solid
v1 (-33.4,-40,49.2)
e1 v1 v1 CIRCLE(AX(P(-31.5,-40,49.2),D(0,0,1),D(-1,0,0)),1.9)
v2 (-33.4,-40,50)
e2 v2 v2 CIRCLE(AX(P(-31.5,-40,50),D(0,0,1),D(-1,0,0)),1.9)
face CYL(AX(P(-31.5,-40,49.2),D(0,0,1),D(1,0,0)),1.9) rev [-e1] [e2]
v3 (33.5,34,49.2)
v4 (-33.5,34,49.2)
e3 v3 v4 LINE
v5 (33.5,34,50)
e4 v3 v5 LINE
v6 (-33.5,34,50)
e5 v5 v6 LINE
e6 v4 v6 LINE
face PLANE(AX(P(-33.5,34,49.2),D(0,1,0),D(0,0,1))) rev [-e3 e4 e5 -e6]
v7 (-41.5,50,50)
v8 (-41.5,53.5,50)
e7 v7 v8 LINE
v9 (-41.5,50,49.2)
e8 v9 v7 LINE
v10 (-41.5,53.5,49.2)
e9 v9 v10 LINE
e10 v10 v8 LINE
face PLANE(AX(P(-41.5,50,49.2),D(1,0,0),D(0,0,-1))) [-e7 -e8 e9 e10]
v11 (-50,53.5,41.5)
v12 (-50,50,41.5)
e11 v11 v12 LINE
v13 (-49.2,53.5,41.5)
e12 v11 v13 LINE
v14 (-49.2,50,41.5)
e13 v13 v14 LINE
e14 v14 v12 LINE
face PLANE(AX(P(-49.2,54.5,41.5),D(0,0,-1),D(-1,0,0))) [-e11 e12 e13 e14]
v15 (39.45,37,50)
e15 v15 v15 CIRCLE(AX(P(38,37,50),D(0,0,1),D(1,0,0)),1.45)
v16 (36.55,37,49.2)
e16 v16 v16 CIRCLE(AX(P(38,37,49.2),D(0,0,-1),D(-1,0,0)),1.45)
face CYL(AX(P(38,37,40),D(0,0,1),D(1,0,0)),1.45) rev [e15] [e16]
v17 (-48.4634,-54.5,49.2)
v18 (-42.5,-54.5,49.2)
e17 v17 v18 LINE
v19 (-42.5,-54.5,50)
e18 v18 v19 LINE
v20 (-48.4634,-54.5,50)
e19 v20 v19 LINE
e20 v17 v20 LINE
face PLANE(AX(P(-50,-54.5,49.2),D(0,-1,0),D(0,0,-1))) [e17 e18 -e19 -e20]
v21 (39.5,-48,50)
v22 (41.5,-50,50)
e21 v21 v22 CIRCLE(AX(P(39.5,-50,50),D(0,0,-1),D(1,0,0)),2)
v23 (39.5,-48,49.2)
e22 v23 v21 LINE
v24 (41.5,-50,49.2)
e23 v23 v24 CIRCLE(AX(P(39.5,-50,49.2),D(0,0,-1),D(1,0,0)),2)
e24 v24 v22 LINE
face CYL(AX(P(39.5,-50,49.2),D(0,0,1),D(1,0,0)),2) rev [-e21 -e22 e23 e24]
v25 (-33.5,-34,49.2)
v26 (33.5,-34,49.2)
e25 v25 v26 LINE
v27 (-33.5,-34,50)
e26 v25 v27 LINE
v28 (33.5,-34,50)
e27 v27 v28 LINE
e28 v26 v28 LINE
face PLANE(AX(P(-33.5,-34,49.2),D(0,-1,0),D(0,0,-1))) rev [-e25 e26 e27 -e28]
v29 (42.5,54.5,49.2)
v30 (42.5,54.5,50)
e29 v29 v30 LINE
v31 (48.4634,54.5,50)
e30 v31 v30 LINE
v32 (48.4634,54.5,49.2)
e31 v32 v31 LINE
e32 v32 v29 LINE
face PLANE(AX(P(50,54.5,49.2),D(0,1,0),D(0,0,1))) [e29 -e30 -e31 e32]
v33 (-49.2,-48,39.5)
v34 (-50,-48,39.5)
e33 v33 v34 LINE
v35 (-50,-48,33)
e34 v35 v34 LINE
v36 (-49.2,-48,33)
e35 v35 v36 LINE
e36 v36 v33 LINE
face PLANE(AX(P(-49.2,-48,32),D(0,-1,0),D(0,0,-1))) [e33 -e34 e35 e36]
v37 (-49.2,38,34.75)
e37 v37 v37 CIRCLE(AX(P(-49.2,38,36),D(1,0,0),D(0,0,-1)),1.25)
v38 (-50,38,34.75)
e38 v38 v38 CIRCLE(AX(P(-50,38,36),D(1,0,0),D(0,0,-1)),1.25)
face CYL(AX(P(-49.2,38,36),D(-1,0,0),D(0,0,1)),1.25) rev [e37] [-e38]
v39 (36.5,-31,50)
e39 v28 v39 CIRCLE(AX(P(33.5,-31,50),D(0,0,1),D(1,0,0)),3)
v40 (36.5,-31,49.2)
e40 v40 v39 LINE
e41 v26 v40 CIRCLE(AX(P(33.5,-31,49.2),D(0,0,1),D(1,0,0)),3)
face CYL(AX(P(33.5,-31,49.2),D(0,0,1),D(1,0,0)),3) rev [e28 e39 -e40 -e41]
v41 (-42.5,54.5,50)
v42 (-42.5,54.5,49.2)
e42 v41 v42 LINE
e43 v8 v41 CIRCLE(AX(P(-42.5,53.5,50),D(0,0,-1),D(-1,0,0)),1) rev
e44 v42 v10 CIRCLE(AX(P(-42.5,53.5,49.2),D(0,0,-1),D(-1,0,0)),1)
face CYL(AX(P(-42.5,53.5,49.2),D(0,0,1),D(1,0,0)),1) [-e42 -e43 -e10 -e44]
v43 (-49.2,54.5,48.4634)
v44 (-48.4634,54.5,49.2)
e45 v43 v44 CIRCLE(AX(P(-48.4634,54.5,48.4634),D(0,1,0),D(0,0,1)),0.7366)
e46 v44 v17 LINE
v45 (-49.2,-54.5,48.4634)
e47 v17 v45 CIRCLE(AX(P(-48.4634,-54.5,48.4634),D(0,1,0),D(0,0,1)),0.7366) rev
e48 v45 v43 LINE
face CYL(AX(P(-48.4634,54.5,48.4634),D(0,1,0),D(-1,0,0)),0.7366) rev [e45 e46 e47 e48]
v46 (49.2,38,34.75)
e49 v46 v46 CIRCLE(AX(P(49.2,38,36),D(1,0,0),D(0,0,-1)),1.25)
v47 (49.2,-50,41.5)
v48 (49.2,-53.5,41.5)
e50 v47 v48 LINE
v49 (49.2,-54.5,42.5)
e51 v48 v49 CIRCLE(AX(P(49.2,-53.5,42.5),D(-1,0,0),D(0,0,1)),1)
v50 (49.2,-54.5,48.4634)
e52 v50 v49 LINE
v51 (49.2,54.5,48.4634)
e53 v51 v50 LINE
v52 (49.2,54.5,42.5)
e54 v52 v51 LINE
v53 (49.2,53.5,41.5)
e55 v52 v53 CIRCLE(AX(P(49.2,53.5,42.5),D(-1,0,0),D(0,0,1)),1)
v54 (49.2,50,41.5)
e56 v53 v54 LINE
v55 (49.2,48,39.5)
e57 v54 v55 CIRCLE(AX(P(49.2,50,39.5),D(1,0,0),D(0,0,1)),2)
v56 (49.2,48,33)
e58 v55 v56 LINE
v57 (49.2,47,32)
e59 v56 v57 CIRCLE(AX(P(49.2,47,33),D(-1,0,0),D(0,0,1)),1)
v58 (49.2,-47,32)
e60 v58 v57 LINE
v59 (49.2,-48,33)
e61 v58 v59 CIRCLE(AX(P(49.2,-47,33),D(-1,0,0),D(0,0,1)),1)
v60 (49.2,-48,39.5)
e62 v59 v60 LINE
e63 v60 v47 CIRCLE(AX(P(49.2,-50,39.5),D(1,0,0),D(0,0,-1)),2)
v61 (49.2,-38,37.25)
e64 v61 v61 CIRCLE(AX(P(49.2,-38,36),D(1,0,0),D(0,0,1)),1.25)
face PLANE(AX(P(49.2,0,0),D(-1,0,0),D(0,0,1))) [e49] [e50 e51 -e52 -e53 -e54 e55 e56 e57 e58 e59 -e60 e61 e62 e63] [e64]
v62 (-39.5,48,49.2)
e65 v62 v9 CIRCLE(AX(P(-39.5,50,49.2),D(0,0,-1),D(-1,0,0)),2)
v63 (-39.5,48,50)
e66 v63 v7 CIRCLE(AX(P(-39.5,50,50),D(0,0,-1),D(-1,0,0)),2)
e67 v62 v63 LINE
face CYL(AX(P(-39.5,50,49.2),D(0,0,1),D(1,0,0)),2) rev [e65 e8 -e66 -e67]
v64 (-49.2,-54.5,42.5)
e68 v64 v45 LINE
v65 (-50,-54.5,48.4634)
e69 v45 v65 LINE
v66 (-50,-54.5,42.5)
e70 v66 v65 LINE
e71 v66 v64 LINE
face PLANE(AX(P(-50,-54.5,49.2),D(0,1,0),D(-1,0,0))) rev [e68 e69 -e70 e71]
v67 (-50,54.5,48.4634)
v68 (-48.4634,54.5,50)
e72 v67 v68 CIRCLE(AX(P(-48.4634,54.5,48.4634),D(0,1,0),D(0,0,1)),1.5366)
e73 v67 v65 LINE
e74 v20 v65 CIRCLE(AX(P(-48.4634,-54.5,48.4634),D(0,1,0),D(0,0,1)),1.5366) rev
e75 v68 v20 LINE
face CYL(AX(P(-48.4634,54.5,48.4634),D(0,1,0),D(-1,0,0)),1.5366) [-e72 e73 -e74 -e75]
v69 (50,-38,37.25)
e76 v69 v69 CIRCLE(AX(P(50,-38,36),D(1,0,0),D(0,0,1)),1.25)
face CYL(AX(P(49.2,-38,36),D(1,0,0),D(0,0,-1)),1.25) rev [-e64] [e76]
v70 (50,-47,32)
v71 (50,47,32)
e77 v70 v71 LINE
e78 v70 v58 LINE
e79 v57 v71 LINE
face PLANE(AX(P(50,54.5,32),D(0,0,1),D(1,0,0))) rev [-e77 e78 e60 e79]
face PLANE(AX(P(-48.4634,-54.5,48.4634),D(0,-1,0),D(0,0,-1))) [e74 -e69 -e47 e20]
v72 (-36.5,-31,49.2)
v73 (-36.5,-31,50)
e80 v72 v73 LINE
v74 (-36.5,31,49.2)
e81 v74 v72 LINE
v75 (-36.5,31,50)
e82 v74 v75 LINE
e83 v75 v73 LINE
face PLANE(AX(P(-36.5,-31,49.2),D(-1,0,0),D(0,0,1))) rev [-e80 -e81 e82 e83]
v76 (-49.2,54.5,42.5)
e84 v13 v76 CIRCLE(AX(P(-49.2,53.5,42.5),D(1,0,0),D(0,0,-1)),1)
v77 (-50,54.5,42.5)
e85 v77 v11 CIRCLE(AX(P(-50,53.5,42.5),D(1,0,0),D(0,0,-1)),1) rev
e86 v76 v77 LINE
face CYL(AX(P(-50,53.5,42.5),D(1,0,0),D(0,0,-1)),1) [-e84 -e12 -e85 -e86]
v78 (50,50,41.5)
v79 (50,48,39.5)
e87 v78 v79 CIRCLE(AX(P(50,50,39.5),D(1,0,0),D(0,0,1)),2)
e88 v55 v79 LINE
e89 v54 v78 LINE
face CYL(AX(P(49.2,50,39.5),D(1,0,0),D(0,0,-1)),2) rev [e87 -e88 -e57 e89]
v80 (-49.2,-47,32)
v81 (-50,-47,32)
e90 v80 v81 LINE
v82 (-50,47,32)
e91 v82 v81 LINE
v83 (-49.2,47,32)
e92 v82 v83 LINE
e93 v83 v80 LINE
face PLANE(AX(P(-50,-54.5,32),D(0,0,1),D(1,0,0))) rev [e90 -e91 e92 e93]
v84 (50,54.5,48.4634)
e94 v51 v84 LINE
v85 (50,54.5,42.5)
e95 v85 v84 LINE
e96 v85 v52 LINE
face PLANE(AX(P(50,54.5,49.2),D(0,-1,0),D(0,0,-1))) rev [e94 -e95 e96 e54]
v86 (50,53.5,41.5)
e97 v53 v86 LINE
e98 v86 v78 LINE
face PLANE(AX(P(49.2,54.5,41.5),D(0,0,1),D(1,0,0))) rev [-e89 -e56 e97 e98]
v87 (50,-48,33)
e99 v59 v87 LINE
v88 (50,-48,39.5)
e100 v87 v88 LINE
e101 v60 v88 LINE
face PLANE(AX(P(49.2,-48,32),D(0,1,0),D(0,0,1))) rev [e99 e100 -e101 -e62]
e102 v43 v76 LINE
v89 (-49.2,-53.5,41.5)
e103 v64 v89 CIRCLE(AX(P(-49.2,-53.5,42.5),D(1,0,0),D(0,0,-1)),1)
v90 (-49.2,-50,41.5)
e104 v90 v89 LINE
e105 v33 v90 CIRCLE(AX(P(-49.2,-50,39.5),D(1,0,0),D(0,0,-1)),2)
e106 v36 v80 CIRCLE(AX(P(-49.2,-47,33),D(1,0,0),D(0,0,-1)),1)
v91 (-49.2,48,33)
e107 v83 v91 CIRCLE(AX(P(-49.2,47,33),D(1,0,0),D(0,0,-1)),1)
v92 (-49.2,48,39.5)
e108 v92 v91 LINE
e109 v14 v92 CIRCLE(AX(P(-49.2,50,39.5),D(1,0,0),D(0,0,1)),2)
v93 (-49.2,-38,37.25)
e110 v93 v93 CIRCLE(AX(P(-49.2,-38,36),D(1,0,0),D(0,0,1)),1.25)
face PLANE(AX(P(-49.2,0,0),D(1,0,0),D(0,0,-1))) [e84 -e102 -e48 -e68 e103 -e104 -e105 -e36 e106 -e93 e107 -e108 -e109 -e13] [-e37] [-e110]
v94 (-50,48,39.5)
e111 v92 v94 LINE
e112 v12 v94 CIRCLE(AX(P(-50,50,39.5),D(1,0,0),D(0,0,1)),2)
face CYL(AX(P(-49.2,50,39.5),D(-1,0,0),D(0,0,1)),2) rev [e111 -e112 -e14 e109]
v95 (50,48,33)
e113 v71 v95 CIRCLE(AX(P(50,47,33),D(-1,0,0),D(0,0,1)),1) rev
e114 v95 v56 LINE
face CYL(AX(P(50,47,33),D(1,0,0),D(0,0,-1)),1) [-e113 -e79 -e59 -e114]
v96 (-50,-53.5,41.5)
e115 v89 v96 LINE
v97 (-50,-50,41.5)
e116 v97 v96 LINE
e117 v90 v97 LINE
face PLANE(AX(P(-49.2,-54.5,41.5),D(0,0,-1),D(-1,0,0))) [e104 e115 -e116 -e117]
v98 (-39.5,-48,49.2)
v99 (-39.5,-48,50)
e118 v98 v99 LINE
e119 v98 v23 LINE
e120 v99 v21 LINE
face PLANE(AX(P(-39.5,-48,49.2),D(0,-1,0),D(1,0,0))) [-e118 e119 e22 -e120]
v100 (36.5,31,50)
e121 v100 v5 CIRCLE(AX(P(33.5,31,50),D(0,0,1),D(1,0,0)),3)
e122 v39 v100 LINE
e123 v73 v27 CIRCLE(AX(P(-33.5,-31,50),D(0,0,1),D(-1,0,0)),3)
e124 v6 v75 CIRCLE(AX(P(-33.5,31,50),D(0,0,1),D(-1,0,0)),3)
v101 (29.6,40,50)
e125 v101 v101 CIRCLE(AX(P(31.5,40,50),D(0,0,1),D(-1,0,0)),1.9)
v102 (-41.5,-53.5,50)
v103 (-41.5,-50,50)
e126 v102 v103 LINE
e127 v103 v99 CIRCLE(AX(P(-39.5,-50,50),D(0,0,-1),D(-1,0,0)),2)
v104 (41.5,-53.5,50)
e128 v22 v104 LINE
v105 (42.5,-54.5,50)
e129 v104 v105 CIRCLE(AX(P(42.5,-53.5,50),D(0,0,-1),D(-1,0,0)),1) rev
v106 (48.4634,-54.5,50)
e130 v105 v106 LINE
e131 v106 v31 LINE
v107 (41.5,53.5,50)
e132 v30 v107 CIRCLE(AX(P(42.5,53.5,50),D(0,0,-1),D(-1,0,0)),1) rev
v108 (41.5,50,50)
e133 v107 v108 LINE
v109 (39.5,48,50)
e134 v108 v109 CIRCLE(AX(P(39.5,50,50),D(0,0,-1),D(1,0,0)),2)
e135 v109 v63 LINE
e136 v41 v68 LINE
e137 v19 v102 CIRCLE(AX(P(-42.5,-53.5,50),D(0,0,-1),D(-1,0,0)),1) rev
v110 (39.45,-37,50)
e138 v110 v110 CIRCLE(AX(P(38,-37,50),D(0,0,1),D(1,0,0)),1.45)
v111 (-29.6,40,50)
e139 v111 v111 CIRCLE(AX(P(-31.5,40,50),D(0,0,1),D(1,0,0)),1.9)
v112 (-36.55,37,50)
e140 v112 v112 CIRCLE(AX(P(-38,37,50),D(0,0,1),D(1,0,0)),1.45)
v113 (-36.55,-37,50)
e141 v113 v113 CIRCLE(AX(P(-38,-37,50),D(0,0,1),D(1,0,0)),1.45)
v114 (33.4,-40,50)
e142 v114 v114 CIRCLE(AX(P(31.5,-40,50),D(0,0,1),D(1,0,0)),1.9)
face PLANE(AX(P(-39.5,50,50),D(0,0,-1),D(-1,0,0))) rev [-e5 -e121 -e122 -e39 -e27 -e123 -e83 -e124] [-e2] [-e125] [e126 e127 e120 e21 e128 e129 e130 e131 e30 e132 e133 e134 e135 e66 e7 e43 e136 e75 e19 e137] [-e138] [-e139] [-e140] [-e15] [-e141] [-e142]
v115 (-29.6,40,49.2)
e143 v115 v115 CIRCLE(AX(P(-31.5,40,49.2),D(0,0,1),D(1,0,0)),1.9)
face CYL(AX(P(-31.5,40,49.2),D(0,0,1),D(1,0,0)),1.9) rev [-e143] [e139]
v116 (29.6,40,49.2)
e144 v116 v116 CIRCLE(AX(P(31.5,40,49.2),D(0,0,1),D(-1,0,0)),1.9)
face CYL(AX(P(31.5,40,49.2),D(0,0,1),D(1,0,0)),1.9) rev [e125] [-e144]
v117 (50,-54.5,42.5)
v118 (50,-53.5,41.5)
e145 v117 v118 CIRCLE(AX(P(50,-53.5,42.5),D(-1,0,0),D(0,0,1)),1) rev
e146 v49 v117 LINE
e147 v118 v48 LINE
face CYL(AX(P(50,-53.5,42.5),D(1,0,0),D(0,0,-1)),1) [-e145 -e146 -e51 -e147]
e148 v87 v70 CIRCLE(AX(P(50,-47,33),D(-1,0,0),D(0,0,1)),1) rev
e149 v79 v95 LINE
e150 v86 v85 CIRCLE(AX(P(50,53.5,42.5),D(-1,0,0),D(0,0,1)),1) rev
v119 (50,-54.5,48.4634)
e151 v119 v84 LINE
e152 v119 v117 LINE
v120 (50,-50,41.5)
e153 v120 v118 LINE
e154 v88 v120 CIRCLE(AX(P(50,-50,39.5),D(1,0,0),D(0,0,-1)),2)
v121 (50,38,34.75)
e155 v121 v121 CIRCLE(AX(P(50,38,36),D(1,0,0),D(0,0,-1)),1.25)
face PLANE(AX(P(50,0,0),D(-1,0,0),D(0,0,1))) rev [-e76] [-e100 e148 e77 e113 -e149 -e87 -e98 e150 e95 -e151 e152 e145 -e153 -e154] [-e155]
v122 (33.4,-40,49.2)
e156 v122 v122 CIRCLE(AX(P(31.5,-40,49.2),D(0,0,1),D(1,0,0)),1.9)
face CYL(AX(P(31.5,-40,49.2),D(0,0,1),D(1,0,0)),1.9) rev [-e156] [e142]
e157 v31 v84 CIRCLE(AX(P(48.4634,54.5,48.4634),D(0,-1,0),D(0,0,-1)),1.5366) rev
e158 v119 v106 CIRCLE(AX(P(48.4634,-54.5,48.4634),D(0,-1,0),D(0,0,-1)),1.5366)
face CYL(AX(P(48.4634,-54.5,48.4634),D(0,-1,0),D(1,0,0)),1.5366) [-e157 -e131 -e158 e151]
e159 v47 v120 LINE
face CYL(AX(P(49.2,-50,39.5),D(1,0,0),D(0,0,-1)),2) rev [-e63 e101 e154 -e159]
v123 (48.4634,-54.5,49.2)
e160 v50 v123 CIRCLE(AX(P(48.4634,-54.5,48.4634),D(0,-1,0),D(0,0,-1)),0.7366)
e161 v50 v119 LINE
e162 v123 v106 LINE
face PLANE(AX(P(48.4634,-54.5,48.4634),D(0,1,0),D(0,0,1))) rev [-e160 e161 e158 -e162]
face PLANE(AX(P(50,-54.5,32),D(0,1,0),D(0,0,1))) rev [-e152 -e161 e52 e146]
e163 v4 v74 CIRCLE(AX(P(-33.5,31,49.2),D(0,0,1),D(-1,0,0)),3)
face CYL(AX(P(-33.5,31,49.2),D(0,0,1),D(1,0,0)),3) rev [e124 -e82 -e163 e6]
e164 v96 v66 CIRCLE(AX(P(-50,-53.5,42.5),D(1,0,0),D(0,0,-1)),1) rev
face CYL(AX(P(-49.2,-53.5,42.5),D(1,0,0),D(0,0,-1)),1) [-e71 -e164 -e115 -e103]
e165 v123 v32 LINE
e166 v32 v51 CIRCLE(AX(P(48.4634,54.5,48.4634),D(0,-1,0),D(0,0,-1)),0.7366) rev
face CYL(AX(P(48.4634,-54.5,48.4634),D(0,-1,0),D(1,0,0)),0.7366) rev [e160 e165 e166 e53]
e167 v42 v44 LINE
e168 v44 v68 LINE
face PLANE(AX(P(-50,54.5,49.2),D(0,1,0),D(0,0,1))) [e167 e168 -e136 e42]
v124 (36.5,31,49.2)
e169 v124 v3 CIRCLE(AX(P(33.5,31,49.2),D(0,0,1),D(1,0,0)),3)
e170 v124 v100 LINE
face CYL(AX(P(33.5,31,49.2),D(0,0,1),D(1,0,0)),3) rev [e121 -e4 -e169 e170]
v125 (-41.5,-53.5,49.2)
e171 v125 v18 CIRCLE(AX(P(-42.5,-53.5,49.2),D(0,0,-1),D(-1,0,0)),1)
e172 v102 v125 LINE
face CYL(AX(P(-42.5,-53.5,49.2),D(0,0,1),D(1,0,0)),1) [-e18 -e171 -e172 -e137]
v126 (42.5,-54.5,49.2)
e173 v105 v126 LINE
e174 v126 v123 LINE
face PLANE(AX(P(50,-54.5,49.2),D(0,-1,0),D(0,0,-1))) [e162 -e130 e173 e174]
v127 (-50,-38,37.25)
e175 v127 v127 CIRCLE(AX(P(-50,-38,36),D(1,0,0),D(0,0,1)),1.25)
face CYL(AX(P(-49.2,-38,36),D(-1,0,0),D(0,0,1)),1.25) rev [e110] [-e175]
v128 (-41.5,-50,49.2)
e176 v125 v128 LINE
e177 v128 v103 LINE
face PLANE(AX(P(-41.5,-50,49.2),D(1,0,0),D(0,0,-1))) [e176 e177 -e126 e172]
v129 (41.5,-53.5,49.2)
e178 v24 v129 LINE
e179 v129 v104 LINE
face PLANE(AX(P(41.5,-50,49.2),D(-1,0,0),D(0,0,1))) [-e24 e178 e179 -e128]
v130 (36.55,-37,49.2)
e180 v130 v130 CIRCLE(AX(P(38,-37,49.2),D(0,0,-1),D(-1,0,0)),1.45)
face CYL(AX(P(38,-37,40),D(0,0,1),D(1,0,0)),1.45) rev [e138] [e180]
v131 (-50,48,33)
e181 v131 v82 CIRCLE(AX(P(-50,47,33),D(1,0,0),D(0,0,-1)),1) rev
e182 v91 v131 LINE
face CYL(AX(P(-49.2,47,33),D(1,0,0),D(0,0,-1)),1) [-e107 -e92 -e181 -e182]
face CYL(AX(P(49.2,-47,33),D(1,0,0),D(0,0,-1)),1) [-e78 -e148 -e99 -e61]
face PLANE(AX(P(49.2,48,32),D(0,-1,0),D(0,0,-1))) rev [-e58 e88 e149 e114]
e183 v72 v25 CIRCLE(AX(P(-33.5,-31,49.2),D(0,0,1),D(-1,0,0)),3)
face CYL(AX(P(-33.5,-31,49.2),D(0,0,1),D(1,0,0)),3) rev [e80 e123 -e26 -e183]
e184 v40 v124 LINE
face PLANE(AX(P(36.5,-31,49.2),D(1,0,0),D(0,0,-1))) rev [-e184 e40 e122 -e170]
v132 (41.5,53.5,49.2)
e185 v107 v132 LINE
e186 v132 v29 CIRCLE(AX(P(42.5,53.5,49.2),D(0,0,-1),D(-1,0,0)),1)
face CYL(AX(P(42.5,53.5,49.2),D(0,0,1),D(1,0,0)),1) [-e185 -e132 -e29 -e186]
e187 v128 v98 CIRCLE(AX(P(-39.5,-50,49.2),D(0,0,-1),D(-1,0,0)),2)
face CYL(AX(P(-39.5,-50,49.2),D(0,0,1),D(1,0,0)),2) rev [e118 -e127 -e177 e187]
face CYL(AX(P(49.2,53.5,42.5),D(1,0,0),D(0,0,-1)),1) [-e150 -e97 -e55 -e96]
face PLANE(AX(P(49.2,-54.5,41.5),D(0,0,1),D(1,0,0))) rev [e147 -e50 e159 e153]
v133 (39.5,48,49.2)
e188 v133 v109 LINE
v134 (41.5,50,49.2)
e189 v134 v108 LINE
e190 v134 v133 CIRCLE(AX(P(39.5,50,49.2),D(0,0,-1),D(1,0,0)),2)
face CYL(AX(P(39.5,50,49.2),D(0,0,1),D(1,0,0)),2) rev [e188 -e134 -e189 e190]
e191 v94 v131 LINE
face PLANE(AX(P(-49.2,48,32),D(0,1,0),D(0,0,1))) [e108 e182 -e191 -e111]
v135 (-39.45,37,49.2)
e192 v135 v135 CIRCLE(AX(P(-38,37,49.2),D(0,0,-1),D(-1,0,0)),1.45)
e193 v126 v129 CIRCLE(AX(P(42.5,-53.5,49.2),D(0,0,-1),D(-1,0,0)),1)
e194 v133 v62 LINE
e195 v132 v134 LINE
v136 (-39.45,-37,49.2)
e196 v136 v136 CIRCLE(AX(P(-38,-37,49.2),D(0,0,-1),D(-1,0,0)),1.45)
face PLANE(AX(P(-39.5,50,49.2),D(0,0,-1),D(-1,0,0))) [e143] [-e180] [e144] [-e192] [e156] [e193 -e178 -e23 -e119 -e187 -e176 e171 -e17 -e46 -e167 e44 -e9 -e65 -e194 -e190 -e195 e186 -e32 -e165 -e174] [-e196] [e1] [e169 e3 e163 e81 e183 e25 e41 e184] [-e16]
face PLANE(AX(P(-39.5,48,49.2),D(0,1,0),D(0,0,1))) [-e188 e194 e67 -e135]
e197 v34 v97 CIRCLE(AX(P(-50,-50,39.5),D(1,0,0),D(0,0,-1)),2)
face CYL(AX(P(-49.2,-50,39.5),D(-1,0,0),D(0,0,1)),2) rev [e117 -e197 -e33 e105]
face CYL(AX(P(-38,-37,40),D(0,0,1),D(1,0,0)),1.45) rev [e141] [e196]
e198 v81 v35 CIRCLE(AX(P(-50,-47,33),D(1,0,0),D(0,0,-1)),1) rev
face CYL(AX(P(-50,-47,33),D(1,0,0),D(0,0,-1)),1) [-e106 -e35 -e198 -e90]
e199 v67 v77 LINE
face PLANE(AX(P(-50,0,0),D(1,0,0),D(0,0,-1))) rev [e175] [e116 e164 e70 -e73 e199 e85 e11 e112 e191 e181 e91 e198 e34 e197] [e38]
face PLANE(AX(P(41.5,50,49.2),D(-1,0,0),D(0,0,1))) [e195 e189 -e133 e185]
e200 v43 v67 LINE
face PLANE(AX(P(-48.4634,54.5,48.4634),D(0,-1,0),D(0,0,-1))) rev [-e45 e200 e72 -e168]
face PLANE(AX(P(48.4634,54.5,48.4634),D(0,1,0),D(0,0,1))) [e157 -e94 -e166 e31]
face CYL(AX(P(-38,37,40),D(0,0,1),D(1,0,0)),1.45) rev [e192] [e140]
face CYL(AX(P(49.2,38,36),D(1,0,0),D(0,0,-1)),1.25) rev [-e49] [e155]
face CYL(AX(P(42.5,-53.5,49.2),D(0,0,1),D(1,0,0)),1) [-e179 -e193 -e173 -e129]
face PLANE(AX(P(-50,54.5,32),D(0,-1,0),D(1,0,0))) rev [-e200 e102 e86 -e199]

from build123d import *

# Parameters (mm, degrees)
BASE_FLANGE1_DEPTH               = 0.8
EDGE_FLANGE1_STRIP_W             = 4.6732
EDGE_FLANGE1_STRIP_H             = 0.8
EDGE_FLANGE1_STRIP_CUT_DEPTH     = 109
EDGE_FLANGE1_DEPTH               = 109
EDGE_FLANGE2_STRIP_W             = 4.6732
EDGE_FLANGE2_STRIP_H             = 0.8
EDGE_FLANGE2_STRIP_CUT_DEPTH     = 109
EDGE_FLANGE2_DEPTH               = 109
MAIN_START                       = 49.2
MAIN_U_CONNECTORS_OUTLINE_R      = 1.25
MAIN_U_CONNECTORS_DEPTH          = 0.8
SOLAR_START                      = 49.2
SOLAR_PANEL_CONNECTORS_OUTLINE_R = 1.9
SOLAR_PANEL_CONNECTORS_DEPTH     = 0.8
CUT_EXTRUDE2_DEPTH               = 0.8
CUT_EXTRUDE3_DEPTH               = 10
SKETCH21_R                       = 1.45
CUT_EXTRUDE4_DEPTH               = 10
FILLET1_R                        = 1


# Read off the part's stored shape, not the designer's step: Main U Connectors, Solar Panel Connectors 
# Sheet-metal steps are written as plain solids
with BuildPart() as part:
    # Sketch1 → Base-Flange1 (new body)
    with BuildSketch(Plane.XY.offset(50)):
        with BuildLine():
            Line((-39.5, 48), (39.5, 48))
            ThreePointArc((39.5, 48), (40.914213562, 48.585786438), (41.5, 50))
            Line((41.5, 50), (41.5, 54.5))
            Line((41.5, 54.5), (50, 54.5))
            Line((50, 54.5), (50, 48))
            Line((50, 48), (50, -48))
            Line((50, -48), (50, -54.5))
            Line((50, -54.5), (41.5, -54.5))
            Line((41.5, -54.5), (41.5, -50))
            ThreePointArc((41.5, -50), (40.914213562, -48.585786438), (39.5, -48))
            Line((39.5, -48), (-39.5, -48))
            ThreePointArc((-39.5, -48), (-40.914213562, -48.585786438), (-41.5, -50))
            Line((-41.5, -50), (-41.5, -54.5))
            Line((-41.5, -54.5), (-50, -54.5))
            Line((-50, -54.5), (-50, -48))
            Line((-50, -48), (-50, 48))
            Line((-50, 48), (-50, 54.5))
            Line((-50, 54.5), (-41.5, 54.5))
            Line((-41.5, 54.5), (-41.5, 50))
            ThreePointArc((-41.5, 50), (-40.914213562, 48.585786438), (-39.5, 48))
        make_face()
    extrude(amount=-BASE_FLANGE1_DEPTH)

    # Edge-Flange1 strip (across the edge) → Edge-Flange1 strip cut (cut)
    with BuildSketch(Plane(origin=(50, 54.5, 49.2), x_dir=(-1, 0, 0), z_dir=(0, -1, 0))):
        with Locations((-0.8, -0.4)):
            Rectangle(EDGE_FLANGE1_STRIP_W, EDGE_FLANGE1_STRIP_H)
    extrude(amount=EDGE_FLANGE1_STRIP_CUT_DEPTH, mode=Mode.SUBTRACT)

    # Edge-Flange1 section (across the edge) → Edge-Flange1 (add)
    with BuildSketch(Plane(origin=(50, 54.5, 49.2), x_dir=(-1, 0, 0), z_dir=(0, -1, 0))):
        with BuildLine():
            Line((0, 0.7366), (0, 17.2))
            Line((0, 17.2), (0.8, 17.2))
            Line((0.8, 17.2), (0.8, 0.7366))
            ThreePointArc((0.8, 0.7366), (1.015745145, 0.215745145), (1.5366, 0))
            Line((1.5366, 0), (1.5366, -0.8))
            ThreePointArc((1.5366, -0.8), (0.45005972, -0.34994028), (0, 0.7366))
        make_face()
    extrude(amount=EDGE_FLANGE1_DEPTH)

    # Edge-Flange2 strip (across the edge) → Edge-Flange2 strip cut (cut)
    with BuildSketch(Plane(origin=(-50, -54.5, 49.2), x_dir=(1, 0, 0), z_dir=(0, 1, 0))):
        with Locations((-0.8, -0.4)):
            Rectangle(EDGE_FLANGE2_STRIP_W, EDGE_FLANGE2_STRIP_H)
    extrude(amount=EDGE_FLANGE2_STRIP_CUT_DEPTH, mode=Mode.SUBTRACT)

    # Edge-Flange2 section (across the edge) → Edge-Flange2 (add)
    with BuildSketch(Plane(origin=(-50, -54.5, 49.2), x_dir=(1, 0, 0), z_dir=(0, 1, 0))):
        with BuildLine():
            Line((0, 0.7366), (0, 17.2))
            Line((0, 17.2), (0.8, 17.2))
            Line((0.8, 17.2), (0.8, 0.7366))
            ThreePointArc((0.8, 0.7366), (1.015745145, 0.215745145), (1.5366, 0))
            Line((1.5366, 0), (1.5366, -0.8))
            ThreePointArc((1.5366, -0.8), (0.45005972, -0.34994028), (0, 0.7366))
        make_face()
    extrude(amount=EDGE_FLANGE2_DEPTH)

    # Main U Connectors outline → Main U Connectors (cut)
    with BuildSketch(Plane.YZ.offset(MAIN_START)):
        with Locations((-38, 36)):
            Circle(MAIN_U_CONNECTORS_OUTLINE_R)
        with Locations((38, 36)):
            Circle(MAIN_U_CONNECTORS_OUTLINE_R)
    main_u_connectors = extrude(amount=MAIN_U_CONNECTORS_DEPTH, mode=Mode.SUBTRACT)

    # Solar Panel Connectors outline → Solar Panel Connectors (cut)
    with BuildSketch(Plane.XY.offset(SOLAR_START)):
        with Locations((-31.5, 40)):
            Circle(SOLAR_PANEL_CONNECTORS_OUTLINE_R)
        with Locations((31.5, 40)):
            Circle(SOLAR_PANEL_CONNECTORS_OUTLINE_R)
        with Locations((31.5, -40)):
            Circle(SOLAR_PANEL_CONNECTORS_OUTLINE_R)
        with Locations((-31.5, -40)):
            Circle(SOLAR_PANEL_CONNECTORS_OUTLINE_R)
    extrude(amount=SOLAR_PANEL_CONNECTORS_DEPTH, mode=Mode.SUBTRACT)

    # Sketch18 → Cut-Extrude2 (cut)
    with BuildSketch(Plane.XY.offset(50)):
        with BuildLine():
            Line((-33.5, -34), (33.5, -34))
            ThreePointArc((33.5, -34), (35.621320344, -33.121320344), (36.5, -31))
            Line((36.5, -31), (36.5, 31))
            ThreePointArc((36.5, 31), (35.621320344, 33.121320344), (33.5, 34))
            Line((33.5, 34), (-33.5, 34))
            ThreePointArc((-33.5, 34), (-35.621320344, 33.121320344), (-36.5, 31))
            Line((-36.5, 31), (-36.5, -31))
            ThreePointArc((-36.5, -31), (-35.621320344, -33.121320344), (-33.5, -34))
        make_face()
    extrude(amount=-CUT_EXTRUDE2_DEPTH, mode=Mode.SUBTRACT)

    # Sketch19 → Cut-Extrude3 (cut)
    with BuildSketch(Plane(origin=(50, 0, 0), x_dir=(0, 0, -1), z_dir=(1, 0, 0))):
        with BuildLine():
            Line((-32, 54.5), (-41.5, 54.5))
            Line((-41.5, 54.5), (-41.5, 50))
            ThreePointArc((-41.5, 50), (-40.914213562, 48.585786438), (-39.5, 48))
            Line((-39.5, 48), (-32, 48))
            Line((-32, 48), (-32, 54.5))
        make_face()
        with BuildLine():
            Line((-41.5, -54.5), (-41.5, -50))
            ThreePointArc((-41.5, -50), (-40.914213562, -48.585786438), (-39.5, -48))
            Line((-39.5, -48), (-32, -48))
            Line((-32, -48), (-32, -54.5))
            Line((-32, -54.5), (-41.5, -54.5))
        make_face()
    cut_extrude3 = extrude(amount=-CUT_EXTRUDE3_DEPTH, mode=Mode.SUBTRACT)

    # Mirror1: Main U Connectors, Cut-Extrude3 across plane
    add(main_u_connectors.mirror(Plane(origin=(0, 0, 0), x_dir=(0, 0, 1), z_dir=(1, 0, 0))), mode=Mode.SUBTRACT)
    add(cut_extrude3.mirror(Plane(origin=(0, 0, 0), x_dir=(0, 0, 1), z_dir=(1, 0, 0))), mode=Mode.SUBTRACT)

    # Sketch21 → Cut-Extrude4 (cut)
    with BuildSketch(Plane.XY.offset(50)):
        with Locations((-38, 37)):
            Circle(SKETCH21_R)
        with Locations((38, 37)):
            Circle(SKETCH21_R)
        with Locations((38, -37)):
            Circle(SKETCH21_R)
        with Locations((-38, -37)):
            Circle(SKETCH21_R)
    extrude(amount=-CUT_EXTRUDE4_DEPTH, mode=Mode.SUBTRACT)

    # Fillet1
    fillet1_edges = [part.edges().sort_by_distance(p)[0] for p in [
        (49.6, 48, 32),
        (49.6, 54.5, 41.5),
        (49.6, -48, 32),
        (49.6, -54.5, 41.5),
        (-49.6, 48, 32),
        (-49.6, 54.5, 41.5),
        (-49.6, -54.5, 41.5),
        (-49.6, -48, 32),
        (-41.5, 54.5, 49.6),
        (41.5, 54.5, 49.6),
        (41.5, -54.5, 49.6),
        (-41.5, -54.5, 49.6),
    ]]
    fillet(fillet1_edges, radius=FILLET1_R)


solid = part.part
